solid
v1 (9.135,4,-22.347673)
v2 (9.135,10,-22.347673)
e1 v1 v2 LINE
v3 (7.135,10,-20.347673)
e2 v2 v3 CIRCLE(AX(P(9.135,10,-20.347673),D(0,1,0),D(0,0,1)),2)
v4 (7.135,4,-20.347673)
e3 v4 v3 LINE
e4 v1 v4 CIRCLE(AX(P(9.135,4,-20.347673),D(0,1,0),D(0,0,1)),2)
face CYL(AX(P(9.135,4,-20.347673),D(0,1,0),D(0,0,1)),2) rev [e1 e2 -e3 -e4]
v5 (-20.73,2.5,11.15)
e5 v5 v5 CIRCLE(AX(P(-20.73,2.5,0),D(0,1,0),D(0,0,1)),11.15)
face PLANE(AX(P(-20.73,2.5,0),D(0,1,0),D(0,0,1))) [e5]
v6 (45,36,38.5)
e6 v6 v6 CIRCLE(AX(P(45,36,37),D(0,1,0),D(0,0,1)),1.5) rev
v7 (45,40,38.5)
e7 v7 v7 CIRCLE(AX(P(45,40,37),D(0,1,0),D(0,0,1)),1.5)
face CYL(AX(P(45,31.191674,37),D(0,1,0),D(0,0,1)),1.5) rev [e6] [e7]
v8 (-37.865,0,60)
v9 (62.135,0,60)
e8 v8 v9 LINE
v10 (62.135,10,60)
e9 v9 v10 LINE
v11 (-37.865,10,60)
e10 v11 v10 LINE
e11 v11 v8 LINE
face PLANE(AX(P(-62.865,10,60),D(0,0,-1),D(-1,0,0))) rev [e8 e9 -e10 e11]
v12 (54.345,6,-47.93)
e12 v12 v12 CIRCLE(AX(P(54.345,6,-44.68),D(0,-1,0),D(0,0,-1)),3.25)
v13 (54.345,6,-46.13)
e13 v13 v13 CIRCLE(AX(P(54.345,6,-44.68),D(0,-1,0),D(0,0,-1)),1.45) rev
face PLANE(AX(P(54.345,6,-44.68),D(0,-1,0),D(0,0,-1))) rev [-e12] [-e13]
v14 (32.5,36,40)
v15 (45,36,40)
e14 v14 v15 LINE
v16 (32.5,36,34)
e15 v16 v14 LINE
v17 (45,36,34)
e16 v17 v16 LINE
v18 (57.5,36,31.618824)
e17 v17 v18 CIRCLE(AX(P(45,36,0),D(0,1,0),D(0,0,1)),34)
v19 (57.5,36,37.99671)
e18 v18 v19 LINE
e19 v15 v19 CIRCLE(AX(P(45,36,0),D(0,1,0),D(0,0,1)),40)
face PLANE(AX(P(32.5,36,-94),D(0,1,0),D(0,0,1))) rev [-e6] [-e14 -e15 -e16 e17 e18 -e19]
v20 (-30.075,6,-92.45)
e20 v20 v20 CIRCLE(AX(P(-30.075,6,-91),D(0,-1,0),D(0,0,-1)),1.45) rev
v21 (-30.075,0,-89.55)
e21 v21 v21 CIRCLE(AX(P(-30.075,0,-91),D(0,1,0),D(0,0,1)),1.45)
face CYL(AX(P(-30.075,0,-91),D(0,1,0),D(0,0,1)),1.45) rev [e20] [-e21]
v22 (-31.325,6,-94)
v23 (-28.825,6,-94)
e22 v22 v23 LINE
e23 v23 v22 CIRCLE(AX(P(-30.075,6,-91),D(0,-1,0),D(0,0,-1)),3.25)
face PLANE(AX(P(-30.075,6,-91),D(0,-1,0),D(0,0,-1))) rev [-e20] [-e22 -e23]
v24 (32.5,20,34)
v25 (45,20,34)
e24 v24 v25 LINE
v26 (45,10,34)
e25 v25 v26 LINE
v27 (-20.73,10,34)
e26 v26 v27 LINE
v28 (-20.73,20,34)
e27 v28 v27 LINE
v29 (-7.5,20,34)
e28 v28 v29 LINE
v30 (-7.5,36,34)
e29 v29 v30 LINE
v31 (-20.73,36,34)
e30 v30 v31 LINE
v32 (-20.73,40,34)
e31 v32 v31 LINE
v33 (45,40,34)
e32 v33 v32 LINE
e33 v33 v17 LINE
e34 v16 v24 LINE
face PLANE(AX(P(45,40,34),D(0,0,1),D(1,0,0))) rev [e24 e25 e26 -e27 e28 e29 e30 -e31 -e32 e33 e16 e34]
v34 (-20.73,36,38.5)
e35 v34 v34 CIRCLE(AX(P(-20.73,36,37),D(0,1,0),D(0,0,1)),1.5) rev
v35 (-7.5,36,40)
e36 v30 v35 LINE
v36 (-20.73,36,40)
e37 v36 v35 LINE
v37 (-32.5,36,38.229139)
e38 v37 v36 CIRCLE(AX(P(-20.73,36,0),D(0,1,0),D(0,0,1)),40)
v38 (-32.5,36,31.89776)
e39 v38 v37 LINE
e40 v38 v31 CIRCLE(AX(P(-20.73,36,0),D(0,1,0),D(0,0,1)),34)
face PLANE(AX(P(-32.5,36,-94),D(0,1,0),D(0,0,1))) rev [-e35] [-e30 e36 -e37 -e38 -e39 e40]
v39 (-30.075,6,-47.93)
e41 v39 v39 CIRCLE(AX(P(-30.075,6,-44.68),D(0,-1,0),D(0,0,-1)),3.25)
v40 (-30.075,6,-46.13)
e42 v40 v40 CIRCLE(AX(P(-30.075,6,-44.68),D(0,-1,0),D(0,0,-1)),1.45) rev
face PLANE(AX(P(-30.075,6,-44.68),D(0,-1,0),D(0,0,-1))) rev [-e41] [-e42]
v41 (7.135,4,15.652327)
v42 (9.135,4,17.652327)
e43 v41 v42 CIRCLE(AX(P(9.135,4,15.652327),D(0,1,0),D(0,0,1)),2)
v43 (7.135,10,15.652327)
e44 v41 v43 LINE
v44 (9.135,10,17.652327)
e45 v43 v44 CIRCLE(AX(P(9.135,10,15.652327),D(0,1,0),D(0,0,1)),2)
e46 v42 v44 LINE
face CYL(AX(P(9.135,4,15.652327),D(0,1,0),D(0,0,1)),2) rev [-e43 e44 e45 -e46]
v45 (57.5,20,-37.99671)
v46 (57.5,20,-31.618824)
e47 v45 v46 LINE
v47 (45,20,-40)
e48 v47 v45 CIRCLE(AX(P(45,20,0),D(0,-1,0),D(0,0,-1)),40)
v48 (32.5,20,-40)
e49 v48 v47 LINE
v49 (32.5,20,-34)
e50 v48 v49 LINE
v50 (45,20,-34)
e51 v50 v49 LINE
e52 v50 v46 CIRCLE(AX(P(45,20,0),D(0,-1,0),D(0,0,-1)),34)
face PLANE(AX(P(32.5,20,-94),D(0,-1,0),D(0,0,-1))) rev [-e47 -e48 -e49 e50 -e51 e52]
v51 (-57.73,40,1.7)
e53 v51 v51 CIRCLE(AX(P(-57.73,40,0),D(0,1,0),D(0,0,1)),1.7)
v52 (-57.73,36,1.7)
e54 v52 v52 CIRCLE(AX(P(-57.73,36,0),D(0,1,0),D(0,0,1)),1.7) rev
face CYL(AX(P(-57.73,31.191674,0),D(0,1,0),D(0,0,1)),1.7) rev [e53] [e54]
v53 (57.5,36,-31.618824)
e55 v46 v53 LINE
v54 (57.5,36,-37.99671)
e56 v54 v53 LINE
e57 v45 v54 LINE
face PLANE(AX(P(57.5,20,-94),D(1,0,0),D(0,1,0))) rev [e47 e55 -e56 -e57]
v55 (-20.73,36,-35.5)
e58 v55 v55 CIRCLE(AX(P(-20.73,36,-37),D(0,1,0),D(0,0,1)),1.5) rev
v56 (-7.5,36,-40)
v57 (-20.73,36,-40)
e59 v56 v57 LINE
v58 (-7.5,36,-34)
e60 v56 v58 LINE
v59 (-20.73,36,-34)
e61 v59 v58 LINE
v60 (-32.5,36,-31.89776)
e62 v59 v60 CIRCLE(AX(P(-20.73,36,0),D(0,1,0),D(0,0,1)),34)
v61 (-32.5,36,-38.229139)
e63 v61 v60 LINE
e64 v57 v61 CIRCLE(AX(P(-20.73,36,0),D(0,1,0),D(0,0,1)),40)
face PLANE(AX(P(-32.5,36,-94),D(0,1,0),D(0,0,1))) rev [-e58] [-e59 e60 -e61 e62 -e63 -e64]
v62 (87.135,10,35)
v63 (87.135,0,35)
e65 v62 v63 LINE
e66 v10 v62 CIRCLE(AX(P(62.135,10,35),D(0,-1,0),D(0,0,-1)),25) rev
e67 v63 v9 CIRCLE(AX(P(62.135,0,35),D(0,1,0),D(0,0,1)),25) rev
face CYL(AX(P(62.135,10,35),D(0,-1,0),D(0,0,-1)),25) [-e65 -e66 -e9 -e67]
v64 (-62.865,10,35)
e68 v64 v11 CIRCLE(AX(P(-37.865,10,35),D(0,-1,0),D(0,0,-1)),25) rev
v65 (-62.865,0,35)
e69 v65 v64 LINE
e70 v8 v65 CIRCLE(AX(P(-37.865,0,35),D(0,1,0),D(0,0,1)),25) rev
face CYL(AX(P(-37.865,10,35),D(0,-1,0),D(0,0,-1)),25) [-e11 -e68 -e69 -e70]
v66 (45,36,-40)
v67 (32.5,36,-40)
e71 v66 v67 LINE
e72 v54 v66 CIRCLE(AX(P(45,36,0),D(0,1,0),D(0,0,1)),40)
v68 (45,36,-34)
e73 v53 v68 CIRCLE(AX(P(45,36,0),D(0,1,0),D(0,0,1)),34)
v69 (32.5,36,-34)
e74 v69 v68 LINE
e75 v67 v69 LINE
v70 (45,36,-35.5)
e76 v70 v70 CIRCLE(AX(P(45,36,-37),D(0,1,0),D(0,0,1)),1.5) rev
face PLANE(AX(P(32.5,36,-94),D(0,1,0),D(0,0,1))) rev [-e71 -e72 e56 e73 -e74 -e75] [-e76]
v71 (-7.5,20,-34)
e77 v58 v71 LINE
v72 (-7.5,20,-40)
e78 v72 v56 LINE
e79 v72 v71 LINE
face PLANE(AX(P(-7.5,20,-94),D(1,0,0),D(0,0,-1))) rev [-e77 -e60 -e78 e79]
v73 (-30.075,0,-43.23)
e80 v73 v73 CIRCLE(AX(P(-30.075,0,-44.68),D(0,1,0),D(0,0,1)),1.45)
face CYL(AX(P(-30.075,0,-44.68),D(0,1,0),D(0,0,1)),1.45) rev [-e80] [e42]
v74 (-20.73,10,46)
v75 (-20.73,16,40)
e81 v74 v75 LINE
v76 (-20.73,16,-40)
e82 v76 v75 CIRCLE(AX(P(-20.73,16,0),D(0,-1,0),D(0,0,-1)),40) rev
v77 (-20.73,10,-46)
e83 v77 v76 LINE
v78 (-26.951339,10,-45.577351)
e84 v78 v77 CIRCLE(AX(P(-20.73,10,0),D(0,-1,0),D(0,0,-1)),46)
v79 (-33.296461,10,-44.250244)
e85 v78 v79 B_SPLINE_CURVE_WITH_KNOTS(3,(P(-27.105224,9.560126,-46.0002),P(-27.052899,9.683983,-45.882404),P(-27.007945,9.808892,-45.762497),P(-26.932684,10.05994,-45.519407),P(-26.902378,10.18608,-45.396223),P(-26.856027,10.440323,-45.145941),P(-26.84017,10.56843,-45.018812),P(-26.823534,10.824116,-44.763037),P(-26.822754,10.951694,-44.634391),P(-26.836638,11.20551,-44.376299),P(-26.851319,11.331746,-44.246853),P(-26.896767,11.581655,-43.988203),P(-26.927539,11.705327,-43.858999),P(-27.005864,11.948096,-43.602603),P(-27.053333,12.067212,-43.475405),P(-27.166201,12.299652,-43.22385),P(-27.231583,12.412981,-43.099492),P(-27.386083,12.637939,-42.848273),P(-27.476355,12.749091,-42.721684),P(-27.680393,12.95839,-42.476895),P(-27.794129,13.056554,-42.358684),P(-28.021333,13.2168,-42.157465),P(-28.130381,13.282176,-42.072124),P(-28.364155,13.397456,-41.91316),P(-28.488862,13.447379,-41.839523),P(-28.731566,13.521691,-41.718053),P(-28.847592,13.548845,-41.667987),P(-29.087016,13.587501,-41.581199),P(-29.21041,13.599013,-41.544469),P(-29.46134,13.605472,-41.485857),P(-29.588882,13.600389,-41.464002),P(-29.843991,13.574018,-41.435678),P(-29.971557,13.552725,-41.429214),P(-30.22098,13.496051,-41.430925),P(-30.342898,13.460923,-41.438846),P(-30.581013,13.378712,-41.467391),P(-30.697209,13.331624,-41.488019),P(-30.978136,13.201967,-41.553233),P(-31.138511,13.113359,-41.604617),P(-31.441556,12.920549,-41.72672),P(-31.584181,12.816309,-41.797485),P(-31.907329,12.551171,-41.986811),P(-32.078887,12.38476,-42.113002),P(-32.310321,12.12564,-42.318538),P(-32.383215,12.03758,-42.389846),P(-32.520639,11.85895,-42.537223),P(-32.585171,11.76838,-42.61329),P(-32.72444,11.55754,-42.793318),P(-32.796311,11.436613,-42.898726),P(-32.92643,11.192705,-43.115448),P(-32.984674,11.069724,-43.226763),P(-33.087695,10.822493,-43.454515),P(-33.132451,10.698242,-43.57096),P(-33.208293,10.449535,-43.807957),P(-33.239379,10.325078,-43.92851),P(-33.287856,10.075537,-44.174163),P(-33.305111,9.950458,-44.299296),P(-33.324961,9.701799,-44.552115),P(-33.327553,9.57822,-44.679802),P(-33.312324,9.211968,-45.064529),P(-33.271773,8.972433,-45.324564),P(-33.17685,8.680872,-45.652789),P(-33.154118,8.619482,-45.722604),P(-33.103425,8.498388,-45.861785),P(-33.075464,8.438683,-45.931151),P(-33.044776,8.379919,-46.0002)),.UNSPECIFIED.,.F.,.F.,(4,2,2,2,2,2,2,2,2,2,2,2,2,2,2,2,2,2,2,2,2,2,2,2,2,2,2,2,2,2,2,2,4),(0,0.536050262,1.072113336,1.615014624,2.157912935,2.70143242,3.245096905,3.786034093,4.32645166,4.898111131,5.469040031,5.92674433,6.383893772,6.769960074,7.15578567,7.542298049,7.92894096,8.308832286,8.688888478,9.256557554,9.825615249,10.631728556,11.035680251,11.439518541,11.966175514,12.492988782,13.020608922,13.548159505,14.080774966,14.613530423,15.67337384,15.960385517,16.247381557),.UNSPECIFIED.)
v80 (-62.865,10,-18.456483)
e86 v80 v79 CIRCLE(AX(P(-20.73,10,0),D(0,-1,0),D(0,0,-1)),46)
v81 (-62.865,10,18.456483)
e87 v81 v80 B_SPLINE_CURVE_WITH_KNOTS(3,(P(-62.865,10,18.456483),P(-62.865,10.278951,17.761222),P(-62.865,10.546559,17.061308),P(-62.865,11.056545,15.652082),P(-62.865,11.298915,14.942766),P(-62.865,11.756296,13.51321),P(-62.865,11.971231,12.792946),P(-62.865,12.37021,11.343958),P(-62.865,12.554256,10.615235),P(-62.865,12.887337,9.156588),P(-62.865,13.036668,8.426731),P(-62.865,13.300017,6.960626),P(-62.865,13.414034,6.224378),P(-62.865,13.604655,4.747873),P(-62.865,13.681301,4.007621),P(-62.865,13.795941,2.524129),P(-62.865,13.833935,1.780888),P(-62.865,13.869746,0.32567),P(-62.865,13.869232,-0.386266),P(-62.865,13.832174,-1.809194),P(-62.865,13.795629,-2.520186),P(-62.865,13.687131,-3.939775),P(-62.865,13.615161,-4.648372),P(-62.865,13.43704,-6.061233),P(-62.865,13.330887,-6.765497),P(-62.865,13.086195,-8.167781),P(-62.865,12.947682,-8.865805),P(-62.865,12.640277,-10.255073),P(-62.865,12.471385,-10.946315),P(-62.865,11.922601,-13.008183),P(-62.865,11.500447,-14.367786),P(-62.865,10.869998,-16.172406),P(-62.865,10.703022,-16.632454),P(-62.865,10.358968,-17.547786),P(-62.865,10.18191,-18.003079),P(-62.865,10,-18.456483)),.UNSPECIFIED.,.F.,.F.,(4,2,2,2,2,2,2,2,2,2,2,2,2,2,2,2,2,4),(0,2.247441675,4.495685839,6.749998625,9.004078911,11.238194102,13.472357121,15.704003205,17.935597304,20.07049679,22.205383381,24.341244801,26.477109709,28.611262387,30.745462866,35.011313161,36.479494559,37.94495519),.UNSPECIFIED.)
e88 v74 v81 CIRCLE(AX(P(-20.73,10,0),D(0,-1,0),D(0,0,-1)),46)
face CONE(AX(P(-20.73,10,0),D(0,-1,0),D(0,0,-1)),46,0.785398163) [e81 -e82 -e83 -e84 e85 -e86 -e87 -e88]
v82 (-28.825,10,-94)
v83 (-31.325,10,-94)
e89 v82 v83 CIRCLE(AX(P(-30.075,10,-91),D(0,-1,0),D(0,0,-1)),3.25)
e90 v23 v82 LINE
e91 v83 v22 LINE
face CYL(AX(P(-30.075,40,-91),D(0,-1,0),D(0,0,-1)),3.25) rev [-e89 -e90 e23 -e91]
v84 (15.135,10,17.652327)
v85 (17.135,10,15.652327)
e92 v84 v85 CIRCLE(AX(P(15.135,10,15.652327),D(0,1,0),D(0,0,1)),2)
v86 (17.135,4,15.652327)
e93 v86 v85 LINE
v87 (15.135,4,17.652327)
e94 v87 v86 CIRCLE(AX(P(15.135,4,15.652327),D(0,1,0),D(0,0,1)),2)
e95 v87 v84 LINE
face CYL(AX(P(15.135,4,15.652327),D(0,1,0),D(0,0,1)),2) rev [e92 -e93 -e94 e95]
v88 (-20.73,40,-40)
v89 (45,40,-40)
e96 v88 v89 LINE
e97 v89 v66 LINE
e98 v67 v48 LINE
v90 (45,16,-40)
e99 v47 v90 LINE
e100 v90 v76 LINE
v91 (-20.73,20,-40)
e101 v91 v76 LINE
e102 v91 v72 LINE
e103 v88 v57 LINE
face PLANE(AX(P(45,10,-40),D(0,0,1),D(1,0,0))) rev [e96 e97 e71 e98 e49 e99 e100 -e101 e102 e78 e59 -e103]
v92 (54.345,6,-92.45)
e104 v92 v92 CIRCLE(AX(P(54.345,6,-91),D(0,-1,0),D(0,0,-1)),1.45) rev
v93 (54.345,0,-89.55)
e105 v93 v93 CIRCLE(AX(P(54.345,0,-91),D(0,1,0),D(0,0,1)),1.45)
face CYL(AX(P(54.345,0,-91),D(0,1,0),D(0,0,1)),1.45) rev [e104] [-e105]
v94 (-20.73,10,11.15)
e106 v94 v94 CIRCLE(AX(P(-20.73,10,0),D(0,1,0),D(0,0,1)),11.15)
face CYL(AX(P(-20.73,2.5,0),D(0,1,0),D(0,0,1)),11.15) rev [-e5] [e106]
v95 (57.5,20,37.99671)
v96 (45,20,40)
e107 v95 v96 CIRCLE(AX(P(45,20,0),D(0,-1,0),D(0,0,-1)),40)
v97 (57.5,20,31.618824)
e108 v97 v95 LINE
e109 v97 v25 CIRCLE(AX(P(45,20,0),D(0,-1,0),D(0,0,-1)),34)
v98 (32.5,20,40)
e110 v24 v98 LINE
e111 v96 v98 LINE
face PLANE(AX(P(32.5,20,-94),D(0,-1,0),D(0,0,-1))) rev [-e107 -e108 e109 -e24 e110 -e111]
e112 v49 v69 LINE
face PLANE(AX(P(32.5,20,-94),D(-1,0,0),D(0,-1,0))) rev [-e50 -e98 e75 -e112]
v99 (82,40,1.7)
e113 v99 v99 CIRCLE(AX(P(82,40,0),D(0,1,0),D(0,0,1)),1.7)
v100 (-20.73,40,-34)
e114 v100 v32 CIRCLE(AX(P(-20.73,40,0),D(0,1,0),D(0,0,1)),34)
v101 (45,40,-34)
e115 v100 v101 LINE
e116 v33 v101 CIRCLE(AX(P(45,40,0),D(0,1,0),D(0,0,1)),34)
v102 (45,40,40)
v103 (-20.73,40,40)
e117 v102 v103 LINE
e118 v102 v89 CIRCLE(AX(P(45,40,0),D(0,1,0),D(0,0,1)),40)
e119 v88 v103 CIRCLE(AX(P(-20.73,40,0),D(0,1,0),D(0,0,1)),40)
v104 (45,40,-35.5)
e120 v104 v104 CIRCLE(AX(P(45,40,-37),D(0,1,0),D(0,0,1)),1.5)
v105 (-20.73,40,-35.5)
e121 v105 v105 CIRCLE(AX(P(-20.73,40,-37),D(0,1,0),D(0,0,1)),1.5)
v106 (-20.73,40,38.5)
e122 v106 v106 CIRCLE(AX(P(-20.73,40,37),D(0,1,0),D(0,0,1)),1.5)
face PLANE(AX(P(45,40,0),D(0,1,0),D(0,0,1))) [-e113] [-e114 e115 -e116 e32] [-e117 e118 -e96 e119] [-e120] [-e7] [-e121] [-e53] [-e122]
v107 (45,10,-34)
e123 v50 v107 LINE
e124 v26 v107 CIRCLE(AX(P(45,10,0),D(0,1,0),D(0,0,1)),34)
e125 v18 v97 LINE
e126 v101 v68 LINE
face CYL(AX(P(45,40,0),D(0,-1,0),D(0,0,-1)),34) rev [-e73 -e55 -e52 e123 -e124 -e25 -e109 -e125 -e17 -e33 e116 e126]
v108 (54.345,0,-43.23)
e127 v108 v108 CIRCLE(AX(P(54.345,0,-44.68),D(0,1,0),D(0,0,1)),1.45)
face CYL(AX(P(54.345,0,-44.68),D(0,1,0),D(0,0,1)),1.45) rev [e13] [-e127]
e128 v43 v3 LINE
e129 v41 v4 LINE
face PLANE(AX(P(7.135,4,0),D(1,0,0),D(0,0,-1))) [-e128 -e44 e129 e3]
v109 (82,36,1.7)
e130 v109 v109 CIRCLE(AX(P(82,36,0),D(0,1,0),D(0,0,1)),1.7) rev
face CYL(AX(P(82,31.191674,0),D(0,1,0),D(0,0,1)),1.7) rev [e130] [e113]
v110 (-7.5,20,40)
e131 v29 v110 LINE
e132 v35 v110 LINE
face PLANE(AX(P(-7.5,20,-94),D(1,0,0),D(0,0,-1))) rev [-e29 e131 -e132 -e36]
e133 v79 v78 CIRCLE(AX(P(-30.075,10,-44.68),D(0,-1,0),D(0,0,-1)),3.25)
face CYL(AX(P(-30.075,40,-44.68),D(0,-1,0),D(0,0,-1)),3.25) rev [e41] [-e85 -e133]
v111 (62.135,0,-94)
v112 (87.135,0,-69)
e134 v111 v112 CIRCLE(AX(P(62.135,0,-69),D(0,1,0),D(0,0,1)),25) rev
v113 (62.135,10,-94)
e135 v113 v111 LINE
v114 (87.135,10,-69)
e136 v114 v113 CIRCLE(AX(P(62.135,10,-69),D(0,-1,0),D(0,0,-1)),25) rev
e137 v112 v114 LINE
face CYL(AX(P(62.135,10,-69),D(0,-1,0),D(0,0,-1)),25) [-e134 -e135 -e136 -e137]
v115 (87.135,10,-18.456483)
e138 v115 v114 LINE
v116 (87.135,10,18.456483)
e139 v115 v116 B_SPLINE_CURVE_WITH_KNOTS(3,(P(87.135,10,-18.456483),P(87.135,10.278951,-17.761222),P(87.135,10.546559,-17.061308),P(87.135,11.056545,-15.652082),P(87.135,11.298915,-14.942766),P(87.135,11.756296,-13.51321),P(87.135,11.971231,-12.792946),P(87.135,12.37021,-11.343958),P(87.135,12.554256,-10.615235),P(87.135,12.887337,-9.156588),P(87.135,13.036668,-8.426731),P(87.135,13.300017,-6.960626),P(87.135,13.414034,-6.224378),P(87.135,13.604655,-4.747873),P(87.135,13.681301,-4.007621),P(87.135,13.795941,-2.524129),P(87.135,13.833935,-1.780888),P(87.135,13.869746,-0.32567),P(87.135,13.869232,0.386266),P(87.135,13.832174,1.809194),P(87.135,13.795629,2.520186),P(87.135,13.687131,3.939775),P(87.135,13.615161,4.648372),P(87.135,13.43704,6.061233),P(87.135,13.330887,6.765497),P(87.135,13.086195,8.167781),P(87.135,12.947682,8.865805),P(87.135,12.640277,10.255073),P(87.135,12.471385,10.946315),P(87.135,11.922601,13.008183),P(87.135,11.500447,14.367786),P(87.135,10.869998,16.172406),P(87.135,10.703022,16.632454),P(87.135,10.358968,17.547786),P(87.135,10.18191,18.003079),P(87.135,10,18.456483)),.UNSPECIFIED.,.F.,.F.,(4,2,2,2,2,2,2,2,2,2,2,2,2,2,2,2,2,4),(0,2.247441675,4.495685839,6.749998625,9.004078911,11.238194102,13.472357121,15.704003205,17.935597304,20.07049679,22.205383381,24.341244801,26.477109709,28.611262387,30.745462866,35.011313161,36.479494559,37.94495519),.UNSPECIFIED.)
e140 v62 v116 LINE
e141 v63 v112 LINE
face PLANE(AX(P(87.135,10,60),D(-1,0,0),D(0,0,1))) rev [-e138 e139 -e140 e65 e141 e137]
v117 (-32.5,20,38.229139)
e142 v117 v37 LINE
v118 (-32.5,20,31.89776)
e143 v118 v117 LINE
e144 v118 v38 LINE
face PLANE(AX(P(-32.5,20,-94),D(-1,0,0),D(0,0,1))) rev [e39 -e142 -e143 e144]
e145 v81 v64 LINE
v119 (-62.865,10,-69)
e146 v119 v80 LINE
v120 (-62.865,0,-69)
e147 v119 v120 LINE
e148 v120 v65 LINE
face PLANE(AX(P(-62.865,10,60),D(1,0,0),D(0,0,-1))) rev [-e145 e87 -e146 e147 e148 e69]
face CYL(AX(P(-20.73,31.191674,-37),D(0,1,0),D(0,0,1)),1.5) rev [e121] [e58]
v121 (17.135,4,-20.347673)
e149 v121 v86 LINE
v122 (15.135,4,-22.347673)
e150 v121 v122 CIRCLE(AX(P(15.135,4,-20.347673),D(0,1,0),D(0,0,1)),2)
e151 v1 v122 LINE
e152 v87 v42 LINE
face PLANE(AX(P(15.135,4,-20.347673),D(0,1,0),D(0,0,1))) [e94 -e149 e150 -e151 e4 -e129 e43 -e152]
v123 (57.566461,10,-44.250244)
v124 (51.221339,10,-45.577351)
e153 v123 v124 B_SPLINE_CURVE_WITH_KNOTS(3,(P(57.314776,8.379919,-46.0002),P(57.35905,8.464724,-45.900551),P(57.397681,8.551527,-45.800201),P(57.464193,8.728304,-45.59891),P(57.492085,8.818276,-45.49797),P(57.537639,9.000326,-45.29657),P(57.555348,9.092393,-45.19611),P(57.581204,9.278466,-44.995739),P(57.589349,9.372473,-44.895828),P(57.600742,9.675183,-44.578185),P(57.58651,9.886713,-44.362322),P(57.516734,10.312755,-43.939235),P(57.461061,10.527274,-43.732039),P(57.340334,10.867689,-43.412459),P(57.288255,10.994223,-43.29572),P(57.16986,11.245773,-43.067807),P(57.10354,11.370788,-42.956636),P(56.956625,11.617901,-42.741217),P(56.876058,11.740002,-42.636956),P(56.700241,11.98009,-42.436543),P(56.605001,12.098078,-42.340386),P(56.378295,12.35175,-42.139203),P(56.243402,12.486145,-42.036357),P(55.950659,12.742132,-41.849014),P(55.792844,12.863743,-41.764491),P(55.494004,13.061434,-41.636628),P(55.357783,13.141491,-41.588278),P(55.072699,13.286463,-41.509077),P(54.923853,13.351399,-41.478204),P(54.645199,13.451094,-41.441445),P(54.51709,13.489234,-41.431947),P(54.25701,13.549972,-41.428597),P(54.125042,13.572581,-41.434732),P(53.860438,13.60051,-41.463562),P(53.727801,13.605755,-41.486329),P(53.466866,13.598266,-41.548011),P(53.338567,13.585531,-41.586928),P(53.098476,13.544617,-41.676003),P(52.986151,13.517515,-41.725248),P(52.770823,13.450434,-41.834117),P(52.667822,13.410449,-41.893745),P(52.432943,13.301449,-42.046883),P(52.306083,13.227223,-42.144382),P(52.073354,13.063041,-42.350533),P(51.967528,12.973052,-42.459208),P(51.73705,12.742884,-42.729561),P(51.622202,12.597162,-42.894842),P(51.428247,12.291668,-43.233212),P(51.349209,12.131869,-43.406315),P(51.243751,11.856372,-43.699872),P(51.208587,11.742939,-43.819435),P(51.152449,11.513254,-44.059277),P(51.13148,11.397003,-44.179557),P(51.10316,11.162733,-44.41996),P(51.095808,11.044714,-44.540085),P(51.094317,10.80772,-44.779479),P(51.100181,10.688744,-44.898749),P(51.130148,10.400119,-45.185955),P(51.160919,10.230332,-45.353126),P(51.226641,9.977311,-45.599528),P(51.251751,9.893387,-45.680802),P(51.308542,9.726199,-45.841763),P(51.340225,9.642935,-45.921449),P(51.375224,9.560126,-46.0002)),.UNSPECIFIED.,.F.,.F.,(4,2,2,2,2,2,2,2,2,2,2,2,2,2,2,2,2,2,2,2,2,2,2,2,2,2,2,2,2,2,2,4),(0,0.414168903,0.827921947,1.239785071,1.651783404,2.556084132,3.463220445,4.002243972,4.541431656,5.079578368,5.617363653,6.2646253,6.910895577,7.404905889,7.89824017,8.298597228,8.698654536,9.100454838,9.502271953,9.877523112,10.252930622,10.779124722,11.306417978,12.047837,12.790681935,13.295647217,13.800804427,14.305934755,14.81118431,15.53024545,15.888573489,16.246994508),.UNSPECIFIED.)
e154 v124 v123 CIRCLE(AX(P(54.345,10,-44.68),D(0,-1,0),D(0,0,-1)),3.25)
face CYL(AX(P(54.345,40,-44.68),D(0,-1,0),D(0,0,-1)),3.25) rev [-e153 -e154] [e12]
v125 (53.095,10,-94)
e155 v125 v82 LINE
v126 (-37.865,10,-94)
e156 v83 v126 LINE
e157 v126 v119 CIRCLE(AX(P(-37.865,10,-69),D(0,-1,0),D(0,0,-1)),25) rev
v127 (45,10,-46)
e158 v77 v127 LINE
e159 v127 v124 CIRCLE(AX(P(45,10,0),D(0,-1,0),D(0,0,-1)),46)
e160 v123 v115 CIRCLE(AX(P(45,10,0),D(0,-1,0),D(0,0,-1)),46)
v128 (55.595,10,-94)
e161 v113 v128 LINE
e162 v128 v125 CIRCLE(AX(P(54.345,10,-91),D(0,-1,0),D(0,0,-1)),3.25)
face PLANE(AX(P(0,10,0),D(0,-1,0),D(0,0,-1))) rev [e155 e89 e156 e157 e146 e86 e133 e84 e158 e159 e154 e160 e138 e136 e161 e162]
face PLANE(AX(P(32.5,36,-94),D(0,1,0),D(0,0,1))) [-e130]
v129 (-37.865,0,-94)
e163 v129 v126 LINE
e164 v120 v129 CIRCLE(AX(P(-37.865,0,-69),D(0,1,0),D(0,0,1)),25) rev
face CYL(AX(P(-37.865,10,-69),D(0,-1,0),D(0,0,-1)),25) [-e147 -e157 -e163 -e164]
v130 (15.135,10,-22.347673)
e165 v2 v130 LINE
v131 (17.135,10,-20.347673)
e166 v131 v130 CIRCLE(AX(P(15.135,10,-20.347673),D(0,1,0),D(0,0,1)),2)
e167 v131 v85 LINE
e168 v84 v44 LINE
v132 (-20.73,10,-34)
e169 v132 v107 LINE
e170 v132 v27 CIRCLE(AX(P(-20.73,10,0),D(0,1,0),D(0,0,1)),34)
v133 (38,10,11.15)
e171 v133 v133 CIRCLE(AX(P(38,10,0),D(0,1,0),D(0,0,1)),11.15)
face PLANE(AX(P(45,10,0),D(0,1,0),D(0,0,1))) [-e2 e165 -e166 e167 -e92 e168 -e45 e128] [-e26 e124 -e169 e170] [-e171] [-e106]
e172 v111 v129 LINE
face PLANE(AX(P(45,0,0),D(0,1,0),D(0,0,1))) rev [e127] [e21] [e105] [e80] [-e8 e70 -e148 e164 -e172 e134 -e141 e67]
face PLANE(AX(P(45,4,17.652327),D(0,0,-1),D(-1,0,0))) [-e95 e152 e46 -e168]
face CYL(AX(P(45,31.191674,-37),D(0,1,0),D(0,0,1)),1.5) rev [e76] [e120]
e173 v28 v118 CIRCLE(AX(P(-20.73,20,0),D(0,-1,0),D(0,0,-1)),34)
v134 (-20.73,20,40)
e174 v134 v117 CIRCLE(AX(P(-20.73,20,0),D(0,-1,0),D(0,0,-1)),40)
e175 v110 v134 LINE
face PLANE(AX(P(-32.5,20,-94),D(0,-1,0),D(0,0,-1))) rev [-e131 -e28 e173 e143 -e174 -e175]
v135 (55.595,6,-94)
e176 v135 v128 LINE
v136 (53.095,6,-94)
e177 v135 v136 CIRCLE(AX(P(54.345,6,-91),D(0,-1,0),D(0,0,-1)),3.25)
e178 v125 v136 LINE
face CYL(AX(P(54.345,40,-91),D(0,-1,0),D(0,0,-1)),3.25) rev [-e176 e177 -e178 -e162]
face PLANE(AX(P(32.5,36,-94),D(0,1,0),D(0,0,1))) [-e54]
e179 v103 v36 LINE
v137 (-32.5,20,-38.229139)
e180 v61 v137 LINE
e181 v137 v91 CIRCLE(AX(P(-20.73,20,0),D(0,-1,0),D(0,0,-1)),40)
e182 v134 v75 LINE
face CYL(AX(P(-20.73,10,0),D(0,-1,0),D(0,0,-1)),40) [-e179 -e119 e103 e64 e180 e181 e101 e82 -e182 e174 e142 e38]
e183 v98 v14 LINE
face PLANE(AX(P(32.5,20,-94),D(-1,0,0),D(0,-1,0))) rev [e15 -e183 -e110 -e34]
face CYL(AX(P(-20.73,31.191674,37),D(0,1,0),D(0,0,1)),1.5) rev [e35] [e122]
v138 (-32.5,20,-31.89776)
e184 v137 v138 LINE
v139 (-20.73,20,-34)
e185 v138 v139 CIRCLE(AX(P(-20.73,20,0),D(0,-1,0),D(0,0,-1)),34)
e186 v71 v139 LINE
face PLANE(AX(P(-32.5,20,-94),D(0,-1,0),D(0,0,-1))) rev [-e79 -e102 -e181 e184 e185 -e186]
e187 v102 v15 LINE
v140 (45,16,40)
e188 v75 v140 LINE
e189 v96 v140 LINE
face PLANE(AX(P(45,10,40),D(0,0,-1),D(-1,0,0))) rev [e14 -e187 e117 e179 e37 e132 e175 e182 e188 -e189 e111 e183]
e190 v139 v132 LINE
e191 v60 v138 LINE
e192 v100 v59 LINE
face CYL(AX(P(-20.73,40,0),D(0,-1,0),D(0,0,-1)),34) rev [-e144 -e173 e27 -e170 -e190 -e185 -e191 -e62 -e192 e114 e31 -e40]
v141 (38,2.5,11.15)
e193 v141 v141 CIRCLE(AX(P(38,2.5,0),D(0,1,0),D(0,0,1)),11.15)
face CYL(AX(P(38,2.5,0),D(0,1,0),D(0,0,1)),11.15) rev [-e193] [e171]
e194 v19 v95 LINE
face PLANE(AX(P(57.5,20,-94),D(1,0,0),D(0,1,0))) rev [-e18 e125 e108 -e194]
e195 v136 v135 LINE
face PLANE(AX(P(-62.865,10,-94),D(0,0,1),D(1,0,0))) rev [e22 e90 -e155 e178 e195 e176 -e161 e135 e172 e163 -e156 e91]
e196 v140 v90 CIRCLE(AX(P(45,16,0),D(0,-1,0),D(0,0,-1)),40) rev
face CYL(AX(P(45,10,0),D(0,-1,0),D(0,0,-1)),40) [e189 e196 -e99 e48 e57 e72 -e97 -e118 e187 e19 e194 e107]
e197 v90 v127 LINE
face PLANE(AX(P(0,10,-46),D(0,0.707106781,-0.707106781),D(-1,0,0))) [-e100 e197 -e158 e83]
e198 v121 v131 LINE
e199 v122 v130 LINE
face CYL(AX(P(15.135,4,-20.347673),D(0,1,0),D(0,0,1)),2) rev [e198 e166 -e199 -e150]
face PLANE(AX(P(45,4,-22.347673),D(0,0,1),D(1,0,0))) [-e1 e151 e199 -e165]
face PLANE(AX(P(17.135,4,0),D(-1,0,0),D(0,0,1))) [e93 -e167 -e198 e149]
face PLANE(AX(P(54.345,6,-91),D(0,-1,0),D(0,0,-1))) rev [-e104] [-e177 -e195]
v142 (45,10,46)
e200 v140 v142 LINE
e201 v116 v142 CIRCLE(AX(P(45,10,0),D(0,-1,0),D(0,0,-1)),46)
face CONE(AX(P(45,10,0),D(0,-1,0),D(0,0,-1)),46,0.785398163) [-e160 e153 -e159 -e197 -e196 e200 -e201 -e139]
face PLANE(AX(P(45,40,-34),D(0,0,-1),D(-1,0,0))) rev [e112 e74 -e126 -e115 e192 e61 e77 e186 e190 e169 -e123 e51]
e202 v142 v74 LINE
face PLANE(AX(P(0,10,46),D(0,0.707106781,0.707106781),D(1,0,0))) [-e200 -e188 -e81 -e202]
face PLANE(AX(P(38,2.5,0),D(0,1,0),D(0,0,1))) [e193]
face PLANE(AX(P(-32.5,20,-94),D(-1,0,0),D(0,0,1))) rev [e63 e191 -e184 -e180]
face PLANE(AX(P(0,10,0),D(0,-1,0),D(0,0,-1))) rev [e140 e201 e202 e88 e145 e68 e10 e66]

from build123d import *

# Parameters (mm, degrees)
BOSS_EXTRUDE1_DEPTH     = 10
BOSS_EXTRUDE2_START     = 10
BOSS_EXTRUDE2_DEPTH     = 30
SKETCH8_W               = 150
SKETCH8_H               = 154
BOSS_EXTRUDE3_DEPTH     = 10
CUT_EXTRUDE2_START      = 10
SKETCH5_R               = 11.15
CUT_EXTRUDE2_DEPTH      = 7.5
CUT_EXTRUDE4_DEPTH      = 135.270280498
CUT_EXTRUDE4_DEPTH_BACK = 135.270280498
SKETCH7_W               = 25
SKETCH7_H               = 16
CHAMFER1_SIZE           = 6
FILLET1_R               = 25
CUT_EXTRUDE5_START      = 40
SKETCH9_R               = 1.5
SKETCH9_R_2             = 1.7
CUT_EXTRUDE5_DEPTH      = 4
CUT_EXTRUDE6_DEPTH      = 176.297069285
CUT_EXTRUDE6_DEPTH_BACK = 176.297069285
SKETCH10_R              = 1.45
CUT_EXTRUDE7_DEPTH      = 135.270280563
CUT_EXTRUDE7_DEPTH_BACK = 4
CUT_EXTRUDE7_START      = 10
SKETCH11_R              = 3.25
CUT_EXTRUDE8_START      = 10
CUT_EXTRUDE8_DEPTH      = 6


with BuildPart() as part:
    # Sketch1 → Boss-Extrude1 (new body)
    with BuildSketch(Plane(origin=(0, 0, 0), x_dir=(1, 0, 0), z_dir=(0, 1, 0))):
        with BuildLine():
            Line((45, 40), (-20.73, 40))
            ThreePointArc((-20.73, 40), (-60.73, 0), (-20.73, -40))
            Line((-20.73, -40), (45, -40))
            ThreePointArc((45, -40), (85, 0), (45, 40))
        make_face()
    extrude(amount=BOSS_EXTRUDE1_DEPTH)

    # Sketch2 → Boss-Extrude2 (add)
    with BuildSketch(Plane(origin=(0, 0, 0), x_dir=(1, 0, 0), z_dir=(0, 1, 0)).offset(BOSS_EXTRUDE2_START)):
        with BuildLine():
            Line((-20.73, -40), (45, -40))
            ThreePointArc((45, -40), (85, 0), (45, 40))
            Line((45, 40), (-20.73, 40))
            ThreePointArc((-20.73, 40), (-60.73, 0), (-20.73, -40))
        make_face()
        with BuildLine():
            Line((45, 34), (-20.73, 34))
            ThreePointArc((-20.73, 34), (-54.73, 0), (-20.73, -34))
            Line((-20.73, -34), (45, -34))
            ThreePointArc((45, -34), (79, 0), (45, 34))
        make_face(mode=Mode.SUBTRACT)
    extrude(amount=BOSS_EXTRUDE2_DEPTH)

    # Sketch8 → Boss-Extrude3 (add)
    with BuildSketch(Plane(origin=(0, 0, 0), x_dir=(1, 0, 0), z_dir=(0, 1, 0))):
        with Locations((12.135, 17)):
            Rectangle(SKETCH8_W, SKETCH8_H)
    extrude(amount=BOSS_EXTRUDE3_DEPTH)

    # Sketch5 → Cut-Extrude2 (cut)
    with BuildSketch(Plane(origin=(0, 0, 0), x_dir=(1, 0, 0), z_dir=(0, 1, 0)).offset(CUT_EXTRUDE2_START)):
        with Locations(Location((-20.73, 0, 0), (0, 0, 270))):
            Circle(SKETCH5_R)
        with Locations(Location((38, 0, 0), (0, 0, 270))):
            Circle(SKETCH5_R)
    extrude(amount=-CUT_EXTRUDE2_DEPTH, mode=Mode.SUBTRACT)

    # Sketch7 → Cut-Extrude4 (cut, two sides: drawn at the far end of the back side and taken through both)
    with BuildSketch(Plane.XY.offset(-CUT_EXTRUDE4_DEPTH_BACK)):
        with Locations((-20, 28)):
            Rectangle(SKETCH7_W, SKETCH7_H)
        with Locations((45, 28)):
            Rectangle(SKETCH7_W, SKETCH7_H)
    extrude(amount=CUT_EXTRUDE4_DEPTH + CUT_EXTRUDE4_DEPTH_BACK, mode=Mode.SUBTRACT)

    # Chamfer1
    # the kernel refuses this chamfer: 6 mm, written as the material it adds along each edge
    with BuildSketch(Plane(origin=(-20.73, 10, 40), x_dir=(0, 0.9996219169112968, -0.02749587661058678), z_dir=(1, 0, 0))) as chamfer1_piece_1:
        Polygon((CHAMFER1_SIZE * 0.999621916911, CHAMFER1_SIZE * 0.0274958766106), (-CHAMFER1_SIZE * 0.0274958766106, CHAMFER1_SIZE * 0.999621916911), (0, 0), align=None)
    extrude(amount=65.73)
    with BuildSketch(Plane(origin=(45, 10, -40), x_dir=(0, -0.02749587661058648, -0.9996219169112968), z_dir=(-1, 0, 0))) as chamfer1_piece_2:
        Polygon((CHAMFER1_SIZE * 0.999621916911, -CHAMFER1_SIZE * 0.0274958766106), (-CHAMFER1_SIZE * 0.0274958766106, -CHAMFER1_SIZE * 0.999621916911), (0, 0), align=None)
    extrude(amount=65.73)
    with BuildSketch(Plane(origin=(45, 10, 0), x_dir=(0, 0, -1), z_dir=(-1, 0, 0))) as chamfer1_piece_3_section:
        Polygon((40 + CHAMFER1_SIZE, 0), (40, -CHAMFER1_SIZE), (40, 0), align=None)
    chamfer1_piece_3 = revolve(axis=Axis((45, 10, 0), (0, -1, 0)), revolution_arc=180, mode=Mode.PRIVATE)
    chamfer1_piece_3 = split(chamfer1_piece_3, bisect_by=Plane(origin=(87.135, 10.791585947, -38.986610485), z_dir=(-1, 0, 0)), keep=Keep.TOP, mode=Mode.PRIVATE)
    add(chamfer1_piece_3)
    with BuildSketch(Plane(origin=(-20.73, 10, 0), x_dir=(0, 0, 1), z_dir=(1, 0, 0))) as chamfer1_piece_4_section:
        Polygon((40, -CHAMFER1_SIZE), (40 + CHAMFER1_SIZE, 0), (40, 0), align=None)
    chamfer1_piece_4 = revolve(axis=Axis((-20.73, 10, 0), (0, -1, 0)), revolution_arc=180, mode=Mode.PRIVATE)
    chamfer1_piece_4 = split(chamfer1_piece_4, bisect_by=Plane(origin=(-62.865, 15.017860126, 35.326549698), z_dir=(1, 0, 0)), keep=Keep.TOP, mode=Mode.PRIVATE)
    add(chamfer1_piece_4)

    # Fillet1
    fillet1_edges = [part.edges().sort_by_distance(p)[0] for p in [
        (87.135, 5, 60),
        (87.135, 5, -94),
        (-62.865, 5, -94),
        (-62.865, 5, 60),
    ]]
    fillet(fillet1_edges, radius=FILLET1_R)

    # Sketch9 → Cut-Extrude5 (cut)
    with BuildSketch(Plane(origin=(0, 0, 0), x_dir=(1, 0, 0), z_dir=(0, 1, 0)).offset(CUT_EXTRUDE5_START)):
        with Locations(Location((45, -37, 0), (0, 0, 270))):
            Circle(SKETCH9_R)
        with Locations(Location((-20.73, -37, 0), (0, 0, 270))):
            Circle(SKETCH9_R)
        with Locations(Location((45, 37, 0), (0, 0, 270))):
            Circle(SKETCH9_R)
        with Locations(Location((-20.73, 37, 0), (0, 0, 270))):
            Circle(SKETCH9_R)
        with Locations(Location((-57.73, 0, 0), (0, 0, 270))):
            Circle(SKETCH9_R_2)
        with Locations(Location((82, 0, 0), (0, 0, 270))):
            Circle(SKETCH9_R_2)
    extrude(amount=-CUT_EXTRUDE5_DEPTH, mode=Mode.SUBTRACT)

    # Sketch10 → Cut-Extrude6 (cut, two sides: drawn at the far end of the back side and taken through both)
    with BuildSketch(Plane(origin=(-45.015, 10, -51.2), x_dir=(1, 0, 0), z_dir=(0, 1, 0)).offset(-CUT_EXTRUDE6_DEPTH_BACK)):
        with Locations(Location((14.94, -6.52, 0), (0, 0, 270))):
            Circle(SKETCH10_R)
        with Locations(Location((99.36, -6.52, 0), (0, 0, 270))):
            Circle(SKETCH10_R)
        with Locations(Location((99.36, 39.8, 0), (0, 0, 270))):
            Circle(SKETCH10_R)
        with Locations(Location((14.94, 39.8, 0), (0, 0, 270))):
            Circle(SKETCH10_R)
    extrude(amount=CUT_EXTRUDE6_DEPTH + CUT_EXTRUDE6_DEPTH_BACK, mode=Mode.SUBTRACT)

    # Sketch11 → Cut-Extrude7 (cut, two sides: drawn at the far end of the back side and taken through both)
    with BuildSketch(Plane(origin=(0, 0, 0), x_dir=(1, 0, 0), z_dir=(0, 1, 0)).offset(CUT_EXTRUDE7_START - CUT_EXTRUDE7_DEPTH_BACK)):
        with Locations(Location((-30.075, 44.68, 0), (0, 0, 90))):
            Circle(SKETCH11_R)
        with Locations((-30.075, 91)):
            Circle(SKETCH11_R)
        with Locations((54.345, 91)):
            Circle(SKETCH11_R)
        with Locations(Location((54.345, 44.68, 0), (0, 0, 90))):
            Circle(SKETCH11_R)
    extrude(amount=CUT_EXTRUDE7_DEPTH + CUT_EXTRUDE7_DEPTH_BACK, mode=Mode.SUBTRACT)

    # Sketch12 → Cut-Extrude8 (cut)
    with BuildSketch(Plane(origin=(0, 0, 0), x_dir=(1, 0, 0), z_dir=(0, 1, 0)).offset(CUT_EXTRUDE8_START)):
        with BuildLine():
            Line((15.135, 22.347672995), (9.135, 22.347672995))
            ThreePointArc((9.135, 22.347672995), (7.720786438, 21.761886557), (7.135, 20.347672995))
            Line((7.135, 20.347672995), (7.135, -15.652327005))
            ThreePointArc((7.135, -15.652327005), (7.720786438, -17.066540567), (9.135, -17.652327005))
            Line((9.135, -17.652327005), (15.135, -17.652327005))
            ThreePointArc((15.135, -17.652327005), (16.549213562, -17.066540567), (17.135, -15.652327005))
            Line((17.135, -15.652327005), (17.135, 20.347672995))
            ThreePointArc((17.135, 20.347672995), (16.549213562, 21.761886557), (15.135, 22.347672995))
        make_face()
    extrude(amount=-CUT_EXTRUDE8_DEPTH, mode=Mode.SUBTRACT)


solid = part.part
